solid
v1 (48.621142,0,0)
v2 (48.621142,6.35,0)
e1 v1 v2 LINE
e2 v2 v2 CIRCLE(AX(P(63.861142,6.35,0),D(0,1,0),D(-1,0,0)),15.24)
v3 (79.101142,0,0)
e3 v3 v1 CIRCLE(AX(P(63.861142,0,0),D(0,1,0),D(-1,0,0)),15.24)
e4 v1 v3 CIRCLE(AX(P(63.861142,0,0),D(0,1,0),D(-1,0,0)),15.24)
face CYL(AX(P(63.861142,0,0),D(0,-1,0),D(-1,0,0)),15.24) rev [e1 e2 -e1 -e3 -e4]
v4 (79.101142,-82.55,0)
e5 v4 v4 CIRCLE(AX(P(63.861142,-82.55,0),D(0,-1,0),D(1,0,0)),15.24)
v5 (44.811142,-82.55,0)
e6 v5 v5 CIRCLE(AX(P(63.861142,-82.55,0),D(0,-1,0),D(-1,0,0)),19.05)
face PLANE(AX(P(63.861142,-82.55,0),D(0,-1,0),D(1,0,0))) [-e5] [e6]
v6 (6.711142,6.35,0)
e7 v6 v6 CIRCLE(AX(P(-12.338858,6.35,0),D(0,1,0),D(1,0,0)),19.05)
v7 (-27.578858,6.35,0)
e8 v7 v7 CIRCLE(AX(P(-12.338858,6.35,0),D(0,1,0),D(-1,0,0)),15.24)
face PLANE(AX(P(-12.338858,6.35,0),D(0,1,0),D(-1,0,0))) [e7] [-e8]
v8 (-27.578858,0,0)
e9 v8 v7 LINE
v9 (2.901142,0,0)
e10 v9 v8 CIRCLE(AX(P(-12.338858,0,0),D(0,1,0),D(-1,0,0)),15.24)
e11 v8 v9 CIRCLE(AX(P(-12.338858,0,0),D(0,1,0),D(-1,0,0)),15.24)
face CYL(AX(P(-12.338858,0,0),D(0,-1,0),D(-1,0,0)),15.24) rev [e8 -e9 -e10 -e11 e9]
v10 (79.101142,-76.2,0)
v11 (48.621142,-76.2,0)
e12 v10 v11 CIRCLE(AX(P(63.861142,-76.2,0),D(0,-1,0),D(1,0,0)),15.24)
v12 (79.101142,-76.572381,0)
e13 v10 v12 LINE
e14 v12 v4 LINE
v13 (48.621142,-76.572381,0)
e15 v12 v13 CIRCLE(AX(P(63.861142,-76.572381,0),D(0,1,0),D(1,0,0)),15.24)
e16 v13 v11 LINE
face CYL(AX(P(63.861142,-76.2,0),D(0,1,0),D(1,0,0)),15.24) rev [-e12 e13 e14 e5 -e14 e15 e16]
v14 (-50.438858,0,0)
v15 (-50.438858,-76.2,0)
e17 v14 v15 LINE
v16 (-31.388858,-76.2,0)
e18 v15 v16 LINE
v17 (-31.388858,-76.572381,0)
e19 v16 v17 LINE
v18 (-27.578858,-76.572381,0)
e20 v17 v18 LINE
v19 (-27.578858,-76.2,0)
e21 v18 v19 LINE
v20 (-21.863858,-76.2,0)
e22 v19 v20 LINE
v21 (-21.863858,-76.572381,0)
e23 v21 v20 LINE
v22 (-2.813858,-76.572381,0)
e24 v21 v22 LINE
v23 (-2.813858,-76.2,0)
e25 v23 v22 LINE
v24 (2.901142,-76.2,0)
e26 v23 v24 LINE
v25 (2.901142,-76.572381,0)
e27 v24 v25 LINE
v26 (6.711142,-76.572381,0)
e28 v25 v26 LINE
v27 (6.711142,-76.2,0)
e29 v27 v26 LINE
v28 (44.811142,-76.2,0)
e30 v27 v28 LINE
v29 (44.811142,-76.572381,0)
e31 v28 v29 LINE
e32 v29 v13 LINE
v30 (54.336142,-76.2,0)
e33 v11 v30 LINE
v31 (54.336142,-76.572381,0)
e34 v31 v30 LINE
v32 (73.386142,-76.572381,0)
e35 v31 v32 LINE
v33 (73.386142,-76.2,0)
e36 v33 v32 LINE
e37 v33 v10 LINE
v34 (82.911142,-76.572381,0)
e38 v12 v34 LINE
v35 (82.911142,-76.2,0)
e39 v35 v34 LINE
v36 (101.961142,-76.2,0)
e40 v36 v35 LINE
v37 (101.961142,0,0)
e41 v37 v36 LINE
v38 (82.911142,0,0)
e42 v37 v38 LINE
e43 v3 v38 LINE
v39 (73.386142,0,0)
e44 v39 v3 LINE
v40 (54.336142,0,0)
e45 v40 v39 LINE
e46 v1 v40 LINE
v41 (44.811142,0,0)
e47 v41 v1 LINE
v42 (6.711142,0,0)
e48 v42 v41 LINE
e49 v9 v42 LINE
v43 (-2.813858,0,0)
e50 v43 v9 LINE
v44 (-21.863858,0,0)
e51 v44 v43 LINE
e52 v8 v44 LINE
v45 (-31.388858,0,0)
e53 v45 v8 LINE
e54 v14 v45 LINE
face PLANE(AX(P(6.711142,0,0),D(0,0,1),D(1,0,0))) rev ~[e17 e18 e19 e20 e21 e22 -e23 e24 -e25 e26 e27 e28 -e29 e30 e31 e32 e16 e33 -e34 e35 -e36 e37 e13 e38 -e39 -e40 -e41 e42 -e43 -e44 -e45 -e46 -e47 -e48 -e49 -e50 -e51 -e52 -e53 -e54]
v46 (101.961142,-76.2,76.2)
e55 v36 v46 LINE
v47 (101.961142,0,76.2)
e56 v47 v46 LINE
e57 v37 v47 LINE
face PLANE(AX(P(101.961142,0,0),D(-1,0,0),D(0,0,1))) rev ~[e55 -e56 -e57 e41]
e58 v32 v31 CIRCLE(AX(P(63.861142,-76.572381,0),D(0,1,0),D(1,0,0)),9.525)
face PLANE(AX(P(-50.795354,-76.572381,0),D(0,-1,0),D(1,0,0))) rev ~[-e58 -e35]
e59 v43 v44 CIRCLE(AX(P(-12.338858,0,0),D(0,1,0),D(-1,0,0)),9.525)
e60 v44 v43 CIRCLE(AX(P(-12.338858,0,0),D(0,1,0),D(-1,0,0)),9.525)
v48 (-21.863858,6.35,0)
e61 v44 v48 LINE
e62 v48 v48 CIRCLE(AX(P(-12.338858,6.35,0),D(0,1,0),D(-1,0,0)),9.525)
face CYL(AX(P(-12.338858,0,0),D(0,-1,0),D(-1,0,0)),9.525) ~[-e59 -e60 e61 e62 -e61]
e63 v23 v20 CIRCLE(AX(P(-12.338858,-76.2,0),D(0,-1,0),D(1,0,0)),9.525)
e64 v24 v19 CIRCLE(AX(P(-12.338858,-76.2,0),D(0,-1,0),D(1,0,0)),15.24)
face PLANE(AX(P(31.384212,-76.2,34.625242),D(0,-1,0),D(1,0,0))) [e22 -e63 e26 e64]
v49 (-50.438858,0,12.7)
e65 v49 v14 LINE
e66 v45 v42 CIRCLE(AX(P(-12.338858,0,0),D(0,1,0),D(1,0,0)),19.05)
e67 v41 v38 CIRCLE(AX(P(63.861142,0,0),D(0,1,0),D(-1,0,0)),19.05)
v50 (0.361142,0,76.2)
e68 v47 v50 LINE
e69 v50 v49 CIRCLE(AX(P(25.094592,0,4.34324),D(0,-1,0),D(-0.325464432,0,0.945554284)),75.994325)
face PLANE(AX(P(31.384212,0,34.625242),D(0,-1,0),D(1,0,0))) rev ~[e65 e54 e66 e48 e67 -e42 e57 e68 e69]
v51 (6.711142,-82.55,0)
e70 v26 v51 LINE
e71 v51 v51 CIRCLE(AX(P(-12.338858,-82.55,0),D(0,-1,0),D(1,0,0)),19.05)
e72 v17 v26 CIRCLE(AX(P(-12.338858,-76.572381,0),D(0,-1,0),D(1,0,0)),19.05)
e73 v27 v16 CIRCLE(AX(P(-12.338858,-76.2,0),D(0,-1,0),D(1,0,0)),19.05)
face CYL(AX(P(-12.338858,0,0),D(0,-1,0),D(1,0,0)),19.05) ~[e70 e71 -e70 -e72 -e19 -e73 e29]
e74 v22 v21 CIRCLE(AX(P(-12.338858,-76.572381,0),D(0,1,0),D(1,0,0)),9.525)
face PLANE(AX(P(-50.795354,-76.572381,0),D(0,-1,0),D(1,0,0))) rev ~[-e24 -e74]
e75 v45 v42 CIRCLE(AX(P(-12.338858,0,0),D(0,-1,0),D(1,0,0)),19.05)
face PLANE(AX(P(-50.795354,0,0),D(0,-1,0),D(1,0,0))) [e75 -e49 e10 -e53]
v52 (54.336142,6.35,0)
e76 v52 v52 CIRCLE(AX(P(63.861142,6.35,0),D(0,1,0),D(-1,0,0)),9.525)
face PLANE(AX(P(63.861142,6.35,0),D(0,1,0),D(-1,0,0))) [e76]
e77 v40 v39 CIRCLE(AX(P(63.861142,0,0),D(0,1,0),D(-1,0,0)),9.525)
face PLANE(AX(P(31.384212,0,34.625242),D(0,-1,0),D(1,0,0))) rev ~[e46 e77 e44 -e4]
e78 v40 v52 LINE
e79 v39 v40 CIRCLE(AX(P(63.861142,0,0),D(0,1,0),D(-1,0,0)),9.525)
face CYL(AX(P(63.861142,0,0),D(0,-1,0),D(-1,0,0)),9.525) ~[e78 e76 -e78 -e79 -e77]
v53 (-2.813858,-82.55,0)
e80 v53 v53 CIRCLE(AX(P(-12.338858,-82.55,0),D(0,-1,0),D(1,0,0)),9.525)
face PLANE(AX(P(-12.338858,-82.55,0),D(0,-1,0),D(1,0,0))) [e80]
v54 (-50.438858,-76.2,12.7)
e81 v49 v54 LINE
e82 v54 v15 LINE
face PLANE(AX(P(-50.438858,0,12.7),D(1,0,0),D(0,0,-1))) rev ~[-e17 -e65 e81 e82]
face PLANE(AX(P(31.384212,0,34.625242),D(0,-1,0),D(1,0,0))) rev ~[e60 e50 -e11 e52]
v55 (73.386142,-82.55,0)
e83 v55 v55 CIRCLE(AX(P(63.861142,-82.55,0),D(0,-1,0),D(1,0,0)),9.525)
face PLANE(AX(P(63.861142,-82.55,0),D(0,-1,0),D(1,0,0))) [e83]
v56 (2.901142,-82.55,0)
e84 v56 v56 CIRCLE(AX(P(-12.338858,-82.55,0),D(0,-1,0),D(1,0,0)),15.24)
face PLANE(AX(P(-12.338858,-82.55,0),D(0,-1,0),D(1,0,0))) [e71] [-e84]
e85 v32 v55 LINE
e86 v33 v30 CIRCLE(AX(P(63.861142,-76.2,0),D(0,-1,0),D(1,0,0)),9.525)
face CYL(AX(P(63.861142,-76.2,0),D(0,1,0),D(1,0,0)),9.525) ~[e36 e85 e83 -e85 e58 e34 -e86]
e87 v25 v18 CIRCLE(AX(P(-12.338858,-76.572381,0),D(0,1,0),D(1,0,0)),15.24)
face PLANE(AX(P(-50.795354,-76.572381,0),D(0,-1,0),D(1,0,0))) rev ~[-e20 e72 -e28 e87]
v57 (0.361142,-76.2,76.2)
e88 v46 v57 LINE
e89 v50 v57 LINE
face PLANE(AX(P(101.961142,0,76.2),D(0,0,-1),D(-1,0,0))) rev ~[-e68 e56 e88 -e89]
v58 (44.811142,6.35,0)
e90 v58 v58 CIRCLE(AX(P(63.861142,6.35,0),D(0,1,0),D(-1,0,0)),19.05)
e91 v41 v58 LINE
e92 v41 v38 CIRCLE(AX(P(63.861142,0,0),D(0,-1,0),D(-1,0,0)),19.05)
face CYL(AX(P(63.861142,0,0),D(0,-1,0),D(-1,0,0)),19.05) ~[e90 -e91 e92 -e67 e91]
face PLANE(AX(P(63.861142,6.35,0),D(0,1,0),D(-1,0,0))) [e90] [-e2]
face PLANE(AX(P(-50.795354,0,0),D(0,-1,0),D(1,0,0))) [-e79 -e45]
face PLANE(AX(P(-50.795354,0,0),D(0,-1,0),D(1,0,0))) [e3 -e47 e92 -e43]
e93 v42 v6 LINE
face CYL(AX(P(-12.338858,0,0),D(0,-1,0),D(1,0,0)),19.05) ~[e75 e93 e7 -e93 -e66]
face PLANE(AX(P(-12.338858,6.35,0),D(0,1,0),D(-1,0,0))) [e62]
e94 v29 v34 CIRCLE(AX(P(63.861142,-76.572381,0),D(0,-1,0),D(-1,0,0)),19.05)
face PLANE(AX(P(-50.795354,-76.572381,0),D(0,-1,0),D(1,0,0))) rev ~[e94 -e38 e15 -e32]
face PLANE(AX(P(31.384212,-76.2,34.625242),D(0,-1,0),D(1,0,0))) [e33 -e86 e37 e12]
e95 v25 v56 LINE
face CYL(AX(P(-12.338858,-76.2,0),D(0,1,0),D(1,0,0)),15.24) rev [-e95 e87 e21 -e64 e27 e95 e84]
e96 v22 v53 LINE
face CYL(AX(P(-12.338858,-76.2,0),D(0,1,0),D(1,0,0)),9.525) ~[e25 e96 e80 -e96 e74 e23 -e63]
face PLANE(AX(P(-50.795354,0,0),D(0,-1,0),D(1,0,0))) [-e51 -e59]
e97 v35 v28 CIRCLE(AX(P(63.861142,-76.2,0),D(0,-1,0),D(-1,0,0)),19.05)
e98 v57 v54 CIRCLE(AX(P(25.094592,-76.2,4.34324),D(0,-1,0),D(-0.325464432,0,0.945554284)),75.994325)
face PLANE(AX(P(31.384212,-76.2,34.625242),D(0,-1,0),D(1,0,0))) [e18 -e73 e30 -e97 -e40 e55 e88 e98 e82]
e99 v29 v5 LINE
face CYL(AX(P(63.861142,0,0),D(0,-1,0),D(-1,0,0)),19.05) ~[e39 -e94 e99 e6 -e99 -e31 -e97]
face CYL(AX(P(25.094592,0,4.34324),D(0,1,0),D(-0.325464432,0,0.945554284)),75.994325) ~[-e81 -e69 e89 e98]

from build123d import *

# Parameters (mm, degrees)
F1_DEPTH = 76.2
F2_R     = 15.24
F3_DEPTH = 6.35
F2_R_2   = 9.525
F4_DEPTH = 6.35
F5_R     = 15.24
F6_DEPTH = 6.35
F5_R_2   = 9.525
F7_DEPTH = 6.35
F8_W     = 152.5372415781
F8_H     = 76.57238096
F9_DEPTH = 25.4


with BuildPart() as f1:
    # F0 (on Front) → F1 (new body)
    with BuildSketch(Plane.XZ):
        with BuildLine():
            Line((82.9111417405, 0), (101.9611417405, 0))
            Line((101.9611417405, 0), (101.9611417405, 76.2))
            Line((101.9611417405, 76.2), (0.3611417405, 76.2))
            ThreePointArc((0.3611417405, 76.2), (-34.2470067394, 51.816518784), (-50.4388582595, 12.7))
            Line((-50.4388582595, 12.7), (-50.4388582595, 0))
            Line((-50.4388582595, 0), (-31.3888582595, 0))
            ThreePointArc((-31.3888582595, 0), (-12.3388582595, 19.05), (6.7111417405, 0))
            Line((6.7111417405, 0), (44.8111417405, 0))
            ThreePointArc((44.8111417405, 0), (63.8611417405, 19.05), (82.9111417405, 0))
        make_face()
        with BuildLine():
            ThreePointArc((44.8111417405, 0), (63.8611417405, -19.05), (82.9111417405, 0))
            Line((82.9111417405, 0), (63.8611417405, 0))
            Line((63.8611417405, 0), (44.8111417405, 0))
        make_face()
        with BuildLine():
            Line((63.8611417405, 0), (82.9111417405, 0))
            ThreePointArc((82.9111417405, 0), (63.8611417405, 19.05), (44.8111417405, 0))
            Line((44.8111417405, 0), (63.8611417405, 0))
        make_face()
        with BuildLine():
            Line((-12.3388582595, 0), (6.7111417405, 0))
            ThreePointArc((6.7111417405, 0), (-12.3388582595, 19.05), (-31.3888582595, 0))
            Line((-31.3888582595, 0), (-12.3388582595, 0))
        make_face()
        with BuildLine():
            ThreePointArc((-31.3888582595, 0), (-12.3388582595, -19.05), (6.7111417405, 0))
            Line((6.7111417405, 0), (-12.3388582595, 0))
            Line((-12.3388582595, 0), (-31.3888582595, 0))
        make_face()
    extrude(amount=F1_DEPTH)

    # F2 (on face) → F3 (join)
    with BuildSketch(Plane.XZ.offset(76.2)):
        with BuildLine():
            ThreePointArc((82.9111417405, 0), (63.8611417405, 19.05), (44.8111417405, 0))
            ThreePointArc((44.8111417405, 0), (63.8611417405, -19.05), (82.9111417405, 0))
        make_face()
        with Locations((63.8611417405, 0)):
            Circle(F2_R, mode=Mode.SUBTRACT)
        with BuildLine():
            ThreePointArc((-31.3888582595, 0), (-12.3388582595, -19.05), (6.7111417405, 0))
            ThreePointArc((6.7111417405, 0), (-12.3388582595, 19.05), (-31.3888582595, 0))
        make_face()
        with Locations((-12.3388582595, 0)):
            Circle(F2_R, mode=Mode.SUBTRACT)
    extrude(amount=F3_DEPTH)

    # F2 (on face) → F4 (join)
    with BuildSketch(Plane.XZ.offset(76.2)):
        with Locations((63.8611417405, 0)):
            Circle(F2_R_2)
        with Locations((-12.3388582595, 0)):
            Circle(F2_R_2)
    extrude(amount=F4_DEPTH)

    # F5 (on face) → F6 (join)
    with BuildSketch(Plane(origin=(0, 0, 0), x_dir=(-1, 0, 0), z_dir=(0, 1, 0))):
        with BuildLine():
            ThreePointArc((-82.9111417405, 0), (-63.8611417405, -19.05), (-44.8111417405, 0))
            ThreePointArc((-44.8111417405, 0), (-63.8611417405, 19.05), (-82.9111417405, 0))
        make_face()
        with Locations((-63.8611417405, 0)):
            Circle(F5_R, mode=Mode.SUBTRACT)
        with BuildLine():
            ThreePointArc((31.3888582595, 0), (12.3388582595, 19.05), (-6.7111417405, 0))
            ThreePointArc((-6.7111417405, 0), (12.3388582595, -19.05), (31.3888582595, 0))
        make_face()
        with Locations((12.3388582595, 0)):
            Circle(F5_R, mode=Mode.SUBTRACT)
    extrude(amount=F6_DEPTH)

    # F5 (on face) → F7 (join)
    with BuildSketch(Plane(origin=(0, 0, 0), x_dir=(-1, 0, 0), z_dir=(0, 1, 0))):
        with Locations((-63.8611417405, 0)):
            Circle(F5_R_2)
        with Locations((12.3388582595, 0)):
            Circle(F5_R_2)
    extrude(amount=F7_DEPTH)

    # F8 (on face) → F9 (cut)
    with BuildSketch(Plane(origin=(0, 0, 0), x_dir=(1, 0, 0), z_dir=(0, 0, -1))):
        with Locations((25.47326684, 38.28619048)):
            Rectangle(F8_W, F8_H)
    extrude(amount=F9_DEPTH, mode=Mode.SUBTRACT)


solid = f1.part
